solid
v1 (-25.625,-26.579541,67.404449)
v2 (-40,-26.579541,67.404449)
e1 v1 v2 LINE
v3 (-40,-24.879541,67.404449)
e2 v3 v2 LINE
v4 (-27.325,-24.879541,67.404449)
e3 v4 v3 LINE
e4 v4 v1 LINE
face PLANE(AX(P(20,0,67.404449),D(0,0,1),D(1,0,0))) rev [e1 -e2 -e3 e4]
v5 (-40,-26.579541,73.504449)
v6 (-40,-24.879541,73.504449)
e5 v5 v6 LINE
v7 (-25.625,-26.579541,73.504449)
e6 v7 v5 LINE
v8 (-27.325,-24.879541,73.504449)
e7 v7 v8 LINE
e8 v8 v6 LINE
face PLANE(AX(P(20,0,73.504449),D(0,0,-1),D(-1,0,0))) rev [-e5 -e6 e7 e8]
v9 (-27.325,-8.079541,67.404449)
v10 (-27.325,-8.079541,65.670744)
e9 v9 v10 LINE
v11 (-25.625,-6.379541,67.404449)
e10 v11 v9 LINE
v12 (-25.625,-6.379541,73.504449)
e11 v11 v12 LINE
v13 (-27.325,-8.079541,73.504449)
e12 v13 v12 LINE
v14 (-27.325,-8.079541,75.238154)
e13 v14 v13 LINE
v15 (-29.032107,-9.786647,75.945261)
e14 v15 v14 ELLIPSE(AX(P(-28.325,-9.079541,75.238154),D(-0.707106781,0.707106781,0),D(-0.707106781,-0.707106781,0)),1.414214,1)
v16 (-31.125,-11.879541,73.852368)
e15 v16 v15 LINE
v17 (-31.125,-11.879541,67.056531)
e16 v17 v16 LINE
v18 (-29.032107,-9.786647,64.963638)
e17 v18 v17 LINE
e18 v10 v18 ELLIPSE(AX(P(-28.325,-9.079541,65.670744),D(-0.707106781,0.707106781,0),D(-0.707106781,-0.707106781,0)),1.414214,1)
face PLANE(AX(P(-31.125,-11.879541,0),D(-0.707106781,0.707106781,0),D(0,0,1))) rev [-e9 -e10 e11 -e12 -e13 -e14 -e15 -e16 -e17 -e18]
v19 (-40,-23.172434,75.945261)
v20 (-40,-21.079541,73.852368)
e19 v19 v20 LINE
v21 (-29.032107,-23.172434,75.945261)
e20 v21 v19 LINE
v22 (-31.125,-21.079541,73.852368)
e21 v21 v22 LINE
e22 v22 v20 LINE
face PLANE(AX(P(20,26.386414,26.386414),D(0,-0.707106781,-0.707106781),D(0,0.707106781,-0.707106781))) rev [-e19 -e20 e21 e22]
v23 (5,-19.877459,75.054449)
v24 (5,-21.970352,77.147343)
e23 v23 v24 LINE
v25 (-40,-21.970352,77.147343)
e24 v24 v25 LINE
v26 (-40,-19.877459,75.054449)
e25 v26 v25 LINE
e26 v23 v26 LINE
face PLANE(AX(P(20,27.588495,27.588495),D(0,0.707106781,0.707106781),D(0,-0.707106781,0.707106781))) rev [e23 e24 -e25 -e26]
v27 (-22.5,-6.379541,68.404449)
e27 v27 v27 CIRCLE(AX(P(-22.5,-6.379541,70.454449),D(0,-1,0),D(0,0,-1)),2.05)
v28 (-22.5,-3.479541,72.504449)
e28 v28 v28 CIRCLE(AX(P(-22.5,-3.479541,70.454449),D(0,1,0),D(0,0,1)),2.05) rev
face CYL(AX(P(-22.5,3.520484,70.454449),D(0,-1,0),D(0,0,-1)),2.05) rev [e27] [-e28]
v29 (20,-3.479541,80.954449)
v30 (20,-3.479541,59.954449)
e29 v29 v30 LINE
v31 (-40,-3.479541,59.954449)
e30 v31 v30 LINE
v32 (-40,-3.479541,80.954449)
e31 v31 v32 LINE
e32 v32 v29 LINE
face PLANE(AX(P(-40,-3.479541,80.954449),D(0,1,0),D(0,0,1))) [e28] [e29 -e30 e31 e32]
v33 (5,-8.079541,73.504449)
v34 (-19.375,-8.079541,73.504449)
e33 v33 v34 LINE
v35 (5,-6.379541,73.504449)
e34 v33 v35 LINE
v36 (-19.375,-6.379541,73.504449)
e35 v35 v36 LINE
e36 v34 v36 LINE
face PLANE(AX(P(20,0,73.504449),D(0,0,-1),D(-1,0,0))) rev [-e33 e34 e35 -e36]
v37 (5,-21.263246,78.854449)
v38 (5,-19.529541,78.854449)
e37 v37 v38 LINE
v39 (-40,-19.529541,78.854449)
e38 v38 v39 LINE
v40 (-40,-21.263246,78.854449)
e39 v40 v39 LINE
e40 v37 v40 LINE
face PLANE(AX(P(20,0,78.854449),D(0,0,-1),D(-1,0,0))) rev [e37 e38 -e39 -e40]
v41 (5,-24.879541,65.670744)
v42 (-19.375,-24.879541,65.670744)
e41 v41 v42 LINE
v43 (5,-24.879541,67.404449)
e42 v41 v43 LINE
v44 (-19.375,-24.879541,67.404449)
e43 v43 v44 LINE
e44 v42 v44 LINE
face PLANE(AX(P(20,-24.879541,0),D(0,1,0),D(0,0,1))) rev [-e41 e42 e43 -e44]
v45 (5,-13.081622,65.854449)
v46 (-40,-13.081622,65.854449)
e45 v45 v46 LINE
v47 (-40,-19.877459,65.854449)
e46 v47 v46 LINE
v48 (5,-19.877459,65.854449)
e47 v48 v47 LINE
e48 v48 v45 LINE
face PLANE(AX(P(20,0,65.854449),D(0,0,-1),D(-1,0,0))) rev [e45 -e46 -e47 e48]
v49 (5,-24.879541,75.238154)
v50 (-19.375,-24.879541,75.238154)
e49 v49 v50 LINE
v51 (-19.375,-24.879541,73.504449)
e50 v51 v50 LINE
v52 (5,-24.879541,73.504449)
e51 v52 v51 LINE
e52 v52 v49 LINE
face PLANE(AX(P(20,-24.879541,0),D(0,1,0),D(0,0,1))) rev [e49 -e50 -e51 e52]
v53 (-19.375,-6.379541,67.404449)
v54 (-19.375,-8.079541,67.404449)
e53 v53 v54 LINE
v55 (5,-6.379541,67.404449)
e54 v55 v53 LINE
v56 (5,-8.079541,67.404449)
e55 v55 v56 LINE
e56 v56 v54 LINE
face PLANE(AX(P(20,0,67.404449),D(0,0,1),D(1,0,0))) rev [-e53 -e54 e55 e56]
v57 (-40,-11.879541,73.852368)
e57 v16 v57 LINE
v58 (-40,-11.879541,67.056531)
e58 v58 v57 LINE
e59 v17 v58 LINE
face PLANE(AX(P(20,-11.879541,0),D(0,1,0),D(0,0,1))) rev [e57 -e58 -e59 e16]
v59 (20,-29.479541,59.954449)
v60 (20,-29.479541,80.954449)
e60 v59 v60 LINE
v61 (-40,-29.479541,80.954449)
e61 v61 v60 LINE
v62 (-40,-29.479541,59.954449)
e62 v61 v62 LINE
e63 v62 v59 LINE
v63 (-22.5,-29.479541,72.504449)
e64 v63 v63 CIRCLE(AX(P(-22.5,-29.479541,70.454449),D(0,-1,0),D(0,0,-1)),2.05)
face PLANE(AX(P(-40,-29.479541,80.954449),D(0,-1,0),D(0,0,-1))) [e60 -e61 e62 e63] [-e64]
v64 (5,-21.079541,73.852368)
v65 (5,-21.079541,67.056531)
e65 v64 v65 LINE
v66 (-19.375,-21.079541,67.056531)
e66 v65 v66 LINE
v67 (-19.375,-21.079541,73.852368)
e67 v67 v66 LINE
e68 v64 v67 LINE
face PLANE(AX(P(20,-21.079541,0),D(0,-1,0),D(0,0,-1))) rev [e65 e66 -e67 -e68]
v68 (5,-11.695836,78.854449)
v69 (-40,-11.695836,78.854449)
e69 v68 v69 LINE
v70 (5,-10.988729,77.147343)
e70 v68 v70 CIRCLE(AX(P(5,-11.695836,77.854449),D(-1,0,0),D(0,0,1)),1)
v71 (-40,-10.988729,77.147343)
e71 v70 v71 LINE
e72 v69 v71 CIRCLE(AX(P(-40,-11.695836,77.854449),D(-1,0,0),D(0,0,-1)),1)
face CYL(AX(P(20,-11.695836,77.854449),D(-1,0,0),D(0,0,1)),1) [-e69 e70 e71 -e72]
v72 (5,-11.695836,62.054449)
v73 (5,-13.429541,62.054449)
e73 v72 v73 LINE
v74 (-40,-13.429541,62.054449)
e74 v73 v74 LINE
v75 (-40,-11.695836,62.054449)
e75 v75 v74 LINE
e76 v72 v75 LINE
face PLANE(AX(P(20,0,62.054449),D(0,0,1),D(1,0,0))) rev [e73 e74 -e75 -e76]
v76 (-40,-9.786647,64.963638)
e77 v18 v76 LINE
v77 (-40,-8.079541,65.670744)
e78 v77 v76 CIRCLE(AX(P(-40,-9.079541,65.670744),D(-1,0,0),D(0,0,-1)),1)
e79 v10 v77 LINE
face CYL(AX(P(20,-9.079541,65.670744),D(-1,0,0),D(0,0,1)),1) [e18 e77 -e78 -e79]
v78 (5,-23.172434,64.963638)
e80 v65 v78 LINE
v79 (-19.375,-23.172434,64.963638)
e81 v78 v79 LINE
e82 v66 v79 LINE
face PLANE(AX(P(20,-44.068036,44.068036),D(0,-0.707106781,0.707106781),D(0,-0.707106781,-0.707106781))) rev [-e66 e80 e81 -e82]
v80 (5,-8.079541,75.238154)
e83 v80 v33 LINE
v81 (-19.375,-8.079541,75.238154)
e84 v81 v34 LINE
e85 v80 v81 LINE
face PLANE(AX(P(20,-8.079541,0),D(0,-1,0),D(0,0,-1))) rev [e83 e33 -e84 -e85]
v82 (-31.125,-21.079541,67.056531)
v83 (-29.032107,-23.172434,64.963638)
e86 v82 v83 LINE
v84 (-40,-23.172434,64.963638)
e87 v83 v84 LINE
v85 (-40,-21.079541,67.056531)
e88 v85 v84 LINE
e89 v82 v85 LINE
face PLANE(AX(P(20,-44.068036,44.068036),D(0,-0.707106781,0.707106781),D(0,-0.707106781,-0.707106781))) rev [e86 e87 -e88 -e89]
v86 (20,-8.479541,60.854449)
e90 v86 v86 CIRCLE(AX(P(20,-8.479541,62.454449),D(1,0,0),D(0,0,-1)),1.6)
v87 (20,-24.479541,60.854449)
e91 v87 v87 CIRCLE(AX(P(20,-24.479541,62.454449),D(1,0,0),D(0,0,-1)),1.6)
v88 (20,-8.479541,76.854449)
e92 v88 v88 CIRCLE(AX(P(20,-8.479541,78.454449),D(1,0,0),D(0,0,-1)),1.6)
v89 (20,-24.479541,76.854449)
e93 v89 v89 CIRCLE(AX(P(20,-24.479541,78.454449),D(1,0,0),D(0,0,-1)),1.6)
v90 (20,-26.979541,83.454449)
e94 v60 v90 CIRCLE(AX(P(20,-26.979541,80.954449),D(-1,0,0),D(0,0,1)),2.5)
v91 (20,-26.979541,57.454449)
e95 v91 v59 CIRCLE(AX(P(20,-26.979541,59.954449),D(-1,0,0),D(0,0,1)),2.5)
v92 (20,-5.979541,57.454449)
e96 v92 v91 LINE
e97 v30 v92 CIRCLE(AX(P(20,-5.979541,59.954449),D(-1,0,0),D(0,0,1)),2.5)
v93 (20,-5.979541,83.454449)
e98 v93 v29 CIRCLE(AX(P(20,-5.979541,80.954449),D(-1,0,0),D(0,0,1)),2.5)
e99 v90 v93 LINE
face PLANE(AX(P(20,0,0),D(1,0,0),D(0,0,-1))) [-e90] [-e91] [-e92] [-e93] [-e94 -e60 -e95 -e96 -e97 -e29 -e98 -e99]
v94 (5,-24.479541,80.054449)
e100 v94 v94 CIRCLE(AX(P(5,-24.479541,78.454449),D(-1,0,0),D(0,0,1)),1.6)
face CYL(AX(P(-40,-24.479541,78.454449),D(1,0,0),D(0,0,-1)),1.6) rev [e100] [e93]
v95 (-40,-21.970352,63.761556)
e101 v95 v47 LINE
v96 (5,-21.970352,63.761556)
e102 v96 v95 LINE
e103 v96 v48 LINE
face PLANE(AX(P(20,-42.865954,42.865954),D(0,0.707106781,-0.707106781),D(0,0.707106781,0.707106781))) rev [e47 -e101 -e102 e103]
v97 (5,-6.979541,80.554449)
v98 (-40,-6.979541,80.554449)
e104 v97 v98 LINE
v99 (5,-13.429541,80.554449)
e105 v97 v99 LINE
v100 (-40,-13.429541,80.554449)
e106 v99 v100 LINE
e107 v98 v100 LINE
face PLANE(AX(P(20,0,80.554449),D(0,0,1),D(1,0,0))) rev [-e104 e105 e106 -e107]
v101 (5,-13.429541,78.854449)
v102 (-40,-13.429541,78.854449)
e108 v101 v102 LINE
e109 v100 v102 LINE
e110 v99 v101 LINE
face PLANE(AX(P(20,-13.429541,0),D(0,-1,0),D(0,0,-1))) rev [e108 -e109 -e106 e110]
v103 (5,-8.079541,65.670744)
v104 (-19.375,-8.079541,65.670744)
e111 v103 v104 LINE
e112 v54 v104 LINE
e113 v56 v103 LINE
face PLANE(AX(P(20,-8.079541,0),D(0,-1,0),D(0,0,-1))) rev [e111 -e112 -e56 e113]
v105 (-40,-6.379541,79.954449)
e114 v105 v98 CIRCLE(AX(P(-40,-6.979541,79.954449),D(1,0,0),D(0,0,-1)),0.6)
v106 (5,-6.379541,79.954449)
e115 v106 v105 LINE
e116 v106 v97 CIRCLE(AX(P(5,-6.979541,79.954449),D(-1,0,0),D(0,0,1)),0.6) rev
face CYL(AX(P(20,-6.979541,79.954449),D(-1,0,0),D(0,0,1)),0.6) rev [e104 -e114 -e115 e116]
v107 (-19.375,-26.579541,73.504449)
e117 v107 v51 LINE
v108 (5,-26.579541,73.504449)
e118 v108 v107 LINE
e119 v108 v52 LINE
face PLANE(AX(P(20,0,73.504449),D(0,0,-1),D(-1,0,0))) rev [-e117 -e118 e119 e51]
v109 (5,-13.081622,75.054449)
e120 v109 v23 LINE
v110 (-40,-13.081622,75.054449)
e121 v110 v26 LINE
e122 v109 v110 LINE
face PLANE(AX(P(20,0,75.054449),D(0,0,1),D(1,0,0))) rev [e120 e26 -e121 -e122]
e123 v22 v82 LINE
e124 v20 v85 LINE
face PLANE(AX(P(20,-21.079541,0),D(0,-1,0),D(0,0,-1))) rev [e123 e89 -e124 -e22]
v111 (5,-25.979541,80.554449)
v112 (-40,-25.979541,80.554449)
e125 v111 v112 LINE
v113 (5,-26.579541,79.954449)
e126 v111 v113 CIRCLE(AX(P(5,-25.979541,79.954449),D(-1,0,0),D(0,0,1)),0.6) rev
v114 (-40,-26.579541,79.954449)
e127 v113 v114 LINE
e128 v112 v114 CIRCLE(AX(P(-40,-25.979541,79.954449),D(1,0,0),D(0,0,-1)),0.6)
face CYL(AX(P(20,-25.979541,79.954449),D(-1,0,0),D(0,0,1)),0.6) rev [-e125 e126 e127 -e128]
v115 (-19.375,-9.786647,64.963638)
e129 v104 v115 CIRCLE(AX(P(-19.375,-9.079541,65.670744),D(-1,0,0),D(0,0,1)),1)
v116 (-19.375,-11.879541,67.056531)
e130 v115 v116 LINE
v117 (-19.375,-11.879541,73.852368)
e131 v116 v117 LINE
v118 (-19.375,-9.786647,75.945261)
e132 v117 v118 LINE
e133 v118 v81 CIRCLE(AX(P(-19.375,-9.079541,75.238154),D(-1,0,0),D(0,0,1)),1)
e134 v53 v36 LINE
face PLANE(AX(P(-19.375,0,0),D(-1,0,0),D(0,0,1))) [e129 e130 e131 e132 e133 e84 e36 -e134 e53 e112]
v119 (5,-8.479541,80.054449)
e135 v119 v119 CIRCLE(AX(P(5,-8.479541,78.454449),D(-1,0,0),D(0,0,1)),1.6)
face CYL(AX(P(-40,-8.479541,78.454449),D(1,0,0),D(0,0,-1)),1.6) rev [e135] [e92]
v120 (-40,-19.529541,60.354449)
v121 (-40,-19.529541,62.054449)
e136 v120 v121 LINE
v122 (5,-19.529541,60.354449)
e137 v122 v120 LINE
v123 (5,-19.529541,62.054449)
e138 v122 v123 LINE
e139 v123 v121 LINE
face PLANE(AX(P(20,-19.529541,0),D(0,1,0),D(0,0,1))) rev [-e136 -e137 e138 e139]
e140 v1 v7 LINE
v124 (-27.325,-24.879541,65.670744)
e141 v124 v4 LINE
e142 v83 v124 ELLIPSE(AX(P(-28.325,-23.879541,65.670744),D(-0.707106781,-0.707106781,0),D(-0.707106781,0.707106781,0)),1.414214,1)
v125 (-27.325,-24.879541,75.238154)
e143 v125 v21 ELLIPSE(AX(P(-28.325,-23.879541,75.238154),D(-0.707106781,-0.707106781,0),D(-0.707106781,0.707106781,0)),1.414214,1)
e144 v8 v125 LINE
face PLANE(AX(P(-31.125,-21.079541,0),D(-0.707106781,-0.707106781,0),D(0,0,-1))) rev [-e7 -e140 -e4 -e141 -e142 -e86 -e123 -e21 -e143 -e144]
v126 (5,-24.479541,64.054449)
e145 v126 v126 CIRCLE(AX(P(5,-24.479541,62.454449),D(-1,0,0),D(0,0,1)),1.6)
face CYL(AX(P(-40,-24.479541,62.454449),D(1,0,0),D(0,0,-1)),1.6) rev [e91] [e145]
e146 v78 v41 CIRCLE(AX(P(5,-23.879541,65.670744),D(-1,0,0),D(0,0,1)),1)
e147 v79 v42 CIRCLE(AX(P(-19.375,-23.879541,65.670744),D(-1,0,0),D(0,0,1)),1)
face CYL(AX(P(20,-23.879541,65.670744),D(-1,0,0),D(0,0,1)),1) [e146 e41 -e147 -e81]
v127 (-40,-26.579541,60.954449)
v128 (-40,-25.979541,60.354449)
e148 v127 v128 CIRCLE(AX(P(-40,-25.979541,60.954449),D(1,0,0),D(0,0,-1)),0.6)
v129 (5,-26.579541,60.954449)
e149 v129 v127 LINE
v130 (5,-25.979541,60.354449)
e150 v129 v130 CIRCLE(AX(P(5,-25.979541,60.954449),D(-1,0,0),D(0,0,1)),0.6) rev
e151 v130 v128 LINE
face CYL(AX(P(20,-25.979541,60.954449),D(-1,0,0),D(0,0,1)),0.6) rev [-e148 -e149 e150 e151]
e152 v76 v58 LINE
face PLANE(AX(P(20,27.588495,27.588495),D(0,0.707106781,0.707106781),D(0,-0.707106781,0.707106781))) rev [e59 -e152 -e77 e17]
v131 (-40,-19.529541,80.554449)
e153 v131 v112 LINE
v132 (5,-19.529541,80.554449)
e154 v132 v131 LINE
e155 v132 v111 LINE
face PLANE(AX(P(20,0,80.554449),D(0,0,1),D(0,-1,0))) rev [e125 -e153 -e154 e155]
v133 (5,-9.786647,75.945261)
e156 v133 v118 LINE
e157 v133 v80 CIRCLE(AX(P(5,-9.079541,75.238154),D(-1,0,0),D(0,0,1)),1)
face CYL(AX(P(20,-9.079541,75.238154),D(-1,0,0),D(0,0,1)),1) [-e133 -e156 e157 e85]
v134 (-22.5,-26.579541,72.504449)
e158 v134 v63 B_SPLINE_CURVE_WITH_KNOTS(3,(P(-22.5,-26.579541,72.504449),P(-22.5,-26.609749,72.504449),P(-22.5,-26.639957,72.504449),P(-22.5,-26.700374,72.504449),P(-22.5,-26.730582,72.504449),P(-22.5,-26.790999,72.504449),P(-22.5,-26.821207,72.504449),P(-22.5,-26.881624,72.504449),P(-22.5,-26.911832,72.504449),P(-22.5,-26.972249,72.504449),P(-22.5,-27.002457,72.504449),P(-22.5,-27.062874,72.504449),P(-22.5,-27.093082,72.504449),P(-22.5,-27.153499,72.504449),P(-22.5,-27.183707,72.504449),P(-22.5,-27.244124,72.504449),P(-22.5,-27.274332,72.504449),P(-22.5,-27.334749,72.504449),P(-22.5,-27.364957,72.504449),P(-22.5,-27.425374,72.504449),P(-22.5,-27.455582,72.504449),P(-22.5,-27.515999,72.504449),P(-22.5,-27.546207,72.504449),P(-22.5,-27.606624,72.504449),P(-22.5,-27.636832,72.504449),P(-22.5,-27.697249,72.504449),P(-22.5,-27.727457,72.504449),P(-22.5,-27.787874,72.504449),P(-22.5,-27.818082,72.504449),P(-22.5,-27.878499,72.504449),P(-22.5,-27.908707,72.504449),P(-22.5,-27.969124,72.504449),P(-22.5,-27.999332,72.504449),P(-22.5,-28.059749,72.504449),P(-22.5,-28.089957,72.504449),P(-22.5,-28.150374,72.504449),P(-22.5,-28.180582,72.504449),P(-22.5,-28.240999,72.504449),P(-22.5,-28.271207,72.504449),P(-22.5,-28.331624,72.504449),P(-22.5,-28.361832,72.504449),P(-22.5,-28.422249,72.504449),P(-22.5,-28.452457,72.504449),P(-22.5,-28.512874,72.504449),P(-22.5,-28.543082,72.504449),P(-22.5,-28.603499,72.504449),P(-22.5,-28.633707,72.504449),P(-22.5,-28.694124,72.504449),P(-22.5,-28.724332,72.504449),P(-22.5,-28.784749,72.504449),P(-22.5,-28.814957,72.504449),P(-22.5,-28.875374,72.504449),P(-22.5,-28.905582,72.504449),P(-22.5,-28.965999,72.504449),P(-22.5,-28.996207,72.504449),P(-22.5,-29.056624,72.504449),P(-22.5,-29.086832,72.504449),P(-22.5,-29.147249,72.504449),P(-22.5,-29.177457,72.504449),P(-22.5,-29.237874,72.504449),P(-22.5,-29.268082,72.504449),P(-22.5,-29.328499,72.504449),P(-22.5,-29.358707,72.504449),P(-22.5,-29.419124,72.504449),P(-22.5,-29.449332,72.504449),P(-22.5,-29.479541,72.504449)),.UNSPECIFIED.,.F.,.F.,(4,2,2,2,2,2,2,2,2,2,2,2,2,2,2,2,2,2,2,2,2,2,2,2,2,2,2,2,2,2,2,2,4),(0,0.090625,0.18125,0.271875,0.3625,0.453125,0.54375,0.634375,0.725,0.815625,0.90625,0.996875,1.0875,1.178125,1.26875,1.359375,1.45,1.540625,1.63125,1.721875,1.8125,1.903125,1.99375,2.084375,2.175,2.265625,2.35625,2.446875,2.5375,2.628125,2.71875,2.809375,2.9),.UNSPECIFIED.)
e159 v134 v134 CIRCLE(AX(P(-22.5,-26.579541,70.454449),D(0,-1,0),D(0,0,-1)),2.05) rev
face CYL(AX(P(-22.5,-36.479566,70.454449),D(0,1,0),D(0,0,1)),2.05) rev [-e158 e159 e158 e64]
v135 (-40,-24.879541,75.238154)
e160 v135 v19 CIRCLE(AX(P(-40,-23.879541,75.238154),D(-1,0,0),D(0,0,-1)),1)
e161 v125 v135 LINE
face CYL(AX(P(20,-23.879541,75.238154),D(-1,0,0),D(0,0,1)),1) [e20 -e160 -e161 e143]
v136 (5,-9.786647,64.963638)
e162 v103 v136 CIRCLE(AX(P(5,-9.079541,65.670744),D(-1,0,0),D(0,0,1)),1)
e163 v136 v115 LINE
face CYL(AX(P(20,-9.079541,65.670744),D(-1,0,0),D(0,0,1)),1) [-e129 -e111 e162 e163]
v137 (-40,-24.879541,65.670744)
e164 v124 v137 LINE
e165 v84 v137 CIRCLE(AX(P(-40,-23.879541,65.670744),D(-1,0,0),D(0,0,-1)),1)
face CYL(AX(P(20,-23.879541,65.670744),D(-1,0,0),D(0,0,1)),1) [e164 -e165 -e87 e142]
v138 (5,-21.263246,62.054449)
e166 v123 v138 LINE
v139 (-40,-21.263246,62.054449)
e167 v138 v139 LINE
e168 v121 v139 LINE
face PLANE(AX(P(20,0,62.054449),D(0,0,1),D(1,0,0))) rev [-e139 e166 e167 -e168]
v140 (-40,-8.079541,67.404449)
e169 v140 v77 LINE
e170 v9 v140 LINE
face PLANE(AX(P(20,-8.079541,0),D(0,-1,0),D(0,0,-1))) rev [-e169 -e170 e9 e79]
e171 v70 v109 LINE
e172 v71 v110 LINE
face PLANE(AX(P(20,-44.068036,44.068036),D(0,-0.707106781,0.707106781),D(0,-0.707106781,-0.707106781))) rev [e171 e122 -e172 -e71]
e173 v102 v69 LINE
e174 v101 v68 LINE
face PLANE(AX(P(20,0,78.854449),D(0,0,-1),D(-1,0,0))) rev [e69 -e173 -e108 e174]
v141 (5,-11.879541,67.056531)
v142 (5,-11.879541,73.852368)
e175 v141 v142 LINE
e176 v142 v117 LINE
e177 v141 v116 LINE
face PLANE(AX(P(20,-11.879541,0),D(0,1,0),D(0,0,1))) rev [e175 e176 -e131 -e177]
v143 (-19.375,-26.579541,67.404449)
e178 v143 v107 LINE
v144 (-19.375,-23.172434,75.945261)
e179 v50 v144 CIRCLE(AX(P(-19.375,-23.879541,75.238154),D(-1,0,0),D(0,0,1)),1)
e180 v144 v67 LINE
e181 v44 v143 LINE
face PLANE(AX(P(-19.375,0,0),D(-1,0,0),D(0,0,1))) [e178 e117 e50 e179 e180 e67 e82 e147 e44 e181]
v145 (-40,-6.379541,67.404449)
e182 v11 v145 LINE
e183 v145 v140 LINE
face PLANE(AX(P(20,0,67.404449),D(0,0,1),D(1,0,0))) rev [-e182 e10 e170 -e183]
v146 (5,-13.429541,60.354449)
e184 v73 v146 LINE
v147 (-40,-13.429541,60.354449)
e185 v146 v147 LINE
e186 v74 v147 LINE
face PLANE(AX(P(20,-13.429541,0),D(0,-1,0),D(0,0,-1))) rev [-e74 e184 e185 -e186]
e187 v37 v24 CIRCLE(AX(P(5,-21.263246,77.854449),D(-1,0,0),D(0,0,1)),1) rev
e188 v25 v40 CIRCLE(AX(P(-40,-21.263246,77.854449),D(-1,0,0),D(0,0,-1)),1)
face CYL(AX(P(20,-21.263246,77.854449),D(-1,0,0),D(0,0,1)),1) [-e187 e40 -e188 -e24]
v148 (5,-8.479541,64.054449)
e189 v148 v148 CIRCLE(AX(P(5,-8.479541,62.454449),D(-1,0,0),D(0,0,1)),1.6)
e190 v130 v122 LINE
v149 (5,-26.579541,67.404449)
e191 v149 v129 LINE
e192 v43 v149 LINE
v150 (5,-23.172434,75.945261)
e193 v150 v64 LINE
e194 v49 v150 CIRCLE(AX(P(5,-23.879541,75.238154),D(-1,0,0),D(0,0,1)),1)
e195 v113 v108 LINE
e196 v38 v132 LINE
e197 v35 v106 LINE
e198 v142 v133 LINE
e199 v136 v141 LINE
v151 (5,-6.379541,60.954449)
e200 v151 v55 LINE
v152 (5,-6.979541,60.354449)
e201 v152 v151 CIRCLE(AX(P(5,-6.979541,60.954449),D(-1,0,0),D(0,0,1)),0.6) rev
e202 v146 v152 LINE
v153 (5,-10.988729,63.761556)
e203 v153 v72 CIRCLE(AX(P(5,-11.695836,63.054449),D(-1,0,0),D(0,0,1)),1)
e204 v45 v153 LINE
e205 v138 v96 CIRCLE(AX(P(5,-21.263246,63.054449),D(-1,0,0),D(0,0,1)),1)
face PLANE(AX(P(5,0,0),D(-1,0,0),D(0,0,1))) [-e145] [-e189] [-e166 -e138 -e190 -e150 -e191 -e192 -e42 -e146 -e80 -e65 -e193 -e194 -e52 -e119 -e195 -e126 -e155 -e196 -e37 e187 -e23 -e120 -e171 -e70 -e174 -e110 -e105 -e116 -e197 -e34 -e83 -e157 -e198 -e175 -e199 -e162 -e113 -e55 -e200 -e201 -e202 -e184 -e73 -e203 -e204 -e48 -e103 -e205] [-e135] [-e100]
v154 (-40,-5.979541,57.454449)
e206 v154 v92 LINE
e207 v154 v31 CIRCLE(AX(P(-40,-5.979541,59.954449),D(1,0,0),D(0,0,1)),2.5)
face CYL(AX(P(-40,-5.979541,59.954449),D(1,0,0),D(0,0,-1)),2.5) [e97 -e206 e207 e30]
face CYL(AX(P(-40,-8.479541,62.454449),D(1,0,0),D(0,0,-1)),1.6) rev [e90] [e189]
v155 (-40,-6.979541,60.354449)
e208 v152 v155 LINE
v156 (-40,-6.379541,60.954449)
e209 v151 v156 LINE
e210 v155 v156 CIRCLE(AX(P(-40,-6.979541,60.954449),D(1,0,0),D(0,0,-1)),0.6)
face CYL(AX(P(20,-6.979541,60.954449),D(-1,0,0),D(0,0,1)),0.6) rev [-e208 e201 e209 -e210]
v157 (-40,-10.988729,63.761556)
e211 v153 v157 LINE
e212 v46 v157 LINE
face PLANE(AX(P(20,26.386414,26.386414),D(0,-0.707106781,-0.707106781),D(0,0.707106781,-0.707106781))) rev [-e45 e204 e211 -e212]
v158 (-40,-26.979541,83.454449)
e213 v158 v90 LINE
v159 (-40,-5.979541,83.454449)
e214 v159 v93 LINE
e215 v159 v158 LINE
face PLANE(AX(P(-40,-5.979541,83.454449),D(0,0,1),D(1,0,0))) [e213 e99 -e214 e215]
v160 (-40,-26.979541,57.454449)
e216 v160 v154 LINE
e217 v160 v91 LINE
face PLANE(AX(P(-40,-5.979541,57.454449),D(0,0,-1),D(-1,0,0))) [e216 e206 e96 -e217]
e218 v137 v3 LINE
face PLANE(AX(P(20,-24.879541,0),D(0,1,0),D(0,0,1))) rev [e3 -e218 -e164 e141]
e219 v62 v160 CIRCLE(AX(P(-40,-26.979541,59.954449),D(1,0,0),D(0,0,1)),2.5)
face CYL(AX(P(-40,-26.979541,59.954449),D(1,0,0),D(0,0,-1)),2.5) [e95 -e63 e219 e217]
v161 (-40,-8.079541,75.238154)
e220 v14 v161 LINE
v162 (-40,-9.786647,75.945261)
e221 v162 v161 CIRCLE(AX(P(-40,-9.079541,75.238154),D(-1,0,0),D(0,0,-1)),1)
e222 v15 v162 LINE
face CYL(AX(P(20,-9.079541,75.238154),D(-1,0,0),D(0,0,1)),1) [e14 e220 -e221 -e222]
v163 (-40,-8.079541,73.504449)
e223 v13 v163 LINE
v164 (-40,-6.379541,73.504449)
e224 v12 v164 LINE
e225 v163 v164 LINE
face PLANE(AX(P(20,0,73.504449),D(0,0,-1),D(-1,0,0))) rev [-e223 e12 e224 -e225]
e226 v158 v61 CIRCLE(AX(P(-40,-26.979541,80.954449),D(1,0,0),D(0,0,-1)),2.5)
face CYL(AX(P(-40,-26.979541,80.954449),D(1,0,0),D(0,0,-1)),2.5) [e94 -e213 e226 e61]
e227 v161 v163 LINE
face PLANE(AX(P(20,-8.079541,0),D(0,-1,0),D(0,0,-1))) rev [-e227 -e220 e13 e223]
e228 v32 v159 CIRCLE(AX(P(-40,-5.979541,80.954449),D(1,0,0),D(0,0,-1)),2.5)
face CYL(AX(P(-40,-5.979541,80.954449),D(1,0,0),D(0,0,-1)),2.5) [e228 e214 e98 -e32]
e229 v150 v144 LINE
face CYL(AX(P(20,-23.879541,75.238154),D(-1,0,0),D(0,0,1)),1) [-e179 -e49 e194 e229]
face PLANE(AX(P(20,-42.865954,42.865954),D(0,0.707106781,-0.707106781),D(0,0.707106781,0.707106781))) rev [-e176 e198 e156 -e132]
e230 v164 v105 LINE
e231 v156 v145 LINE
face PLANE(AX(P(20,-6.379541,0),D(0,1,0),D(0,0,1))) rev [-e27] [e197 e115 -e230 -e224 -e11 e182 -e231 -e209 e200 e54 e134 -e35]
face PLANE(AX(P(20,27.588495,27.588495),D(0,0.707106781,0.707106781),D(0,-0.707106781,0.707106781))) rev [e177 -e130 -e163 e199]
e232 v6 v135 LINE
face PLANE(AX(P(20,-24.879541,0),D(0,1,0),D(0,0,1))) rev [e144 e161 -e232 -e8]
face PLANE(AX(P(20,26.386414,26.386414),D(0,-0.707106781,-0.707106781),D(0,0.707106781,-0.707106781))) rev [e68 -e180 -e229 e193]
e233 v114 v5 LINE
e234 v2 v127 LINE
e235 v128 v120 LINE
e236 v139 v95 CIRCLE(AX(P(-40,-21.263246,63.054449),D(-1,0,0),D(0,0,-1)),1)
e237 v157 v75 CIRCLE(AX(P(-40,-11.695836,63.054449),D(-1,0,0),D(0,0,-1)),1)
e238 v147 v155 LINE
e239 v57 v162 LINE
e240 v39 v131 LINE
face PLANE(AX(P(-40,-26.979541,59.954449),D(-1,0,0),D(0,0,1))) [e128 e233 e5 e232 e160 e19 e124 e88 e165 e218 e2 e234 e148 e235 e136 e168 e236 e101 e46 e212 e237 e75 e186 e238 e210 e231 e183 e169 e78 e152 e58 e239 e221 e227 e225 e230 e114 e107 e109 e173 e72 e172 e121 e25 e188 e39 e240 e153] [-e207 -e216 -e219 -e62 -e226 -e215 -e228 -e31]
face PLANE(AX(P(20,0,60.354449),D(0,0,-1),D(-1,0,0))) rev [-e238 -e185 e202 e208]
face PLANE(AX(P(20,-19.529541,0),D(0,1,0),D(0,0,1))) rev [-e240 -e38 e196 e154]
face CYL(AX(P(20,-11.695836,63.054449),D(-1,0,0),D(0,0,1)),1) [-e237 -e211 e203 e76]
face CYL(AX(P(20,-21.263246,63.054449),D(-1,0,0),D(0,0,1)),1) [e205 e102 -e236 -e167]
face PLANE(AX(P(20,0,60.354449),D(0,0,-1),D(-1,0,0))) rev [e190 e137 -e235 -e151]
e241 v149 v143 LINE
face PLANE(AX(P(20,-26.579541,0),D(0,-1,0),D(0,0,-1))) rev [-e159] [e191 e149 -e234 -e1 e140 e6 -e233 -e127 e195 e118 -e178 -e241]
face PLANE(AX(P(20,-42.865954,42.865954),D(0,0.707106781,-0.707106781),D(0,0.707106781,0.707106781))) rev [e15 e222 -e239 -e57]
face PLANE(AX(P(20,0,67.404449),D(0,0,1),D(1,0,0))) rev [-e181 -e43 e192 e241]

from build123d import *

# Parameters (mm, degrees)
BOSS_EXTRUDE1_DEPTH      = 39
BOSS_EXTRUDE1_DEPTH_BACK = 20
SKETCH1_W                = 42
SKETCH1_H                = 40
CUT_EXTRUDE3_DEPTH       = 68.939361812
CUT_EXTRUDE3_DEPTH_BACK  = 68.939361812
BOSS_EXTRUDE2_DEPTH      = 40
CUT_EXTRUDE7_START       = -10
SKETCH7_R                = 2.05
CUT_EXTRUDE7_DEPTH       = 116.132850877
CUT_EXTRUDE8_DEPTH       = 3.125
SKETCH9_R                = 2.778089848
BOSS_EXTRUDE3_DEPTH      = 6
CIRPATTERN1_COUNT        = 2
SKETCH10_W               = 6.985924482
SKETCH10_H               = 7.120269183
CUT_EXTRUDE13_DEPTH      = 8
SKETCH14_OUTSIDE_W       = 60.69
SKETCH14_OUTSIDE_H       = 58.69
CUT_EXTRUDE14_DEPTH      = 116.302529068
CHAMFER1_SIZE            = 5.5
SKETCH17_W               = 21.827069389
SKETCH17_H               = 22.909403407
BOSS_EXTRUDE4_DEPTH      = 15
SKETCH18_R               = 1.6
CUT_EXTRUDE15_DEPTH      = 107.928426814


with BuildPart() as part:
    # Sketch1 → Boss-Extrude1 (new, two sides: drawn at the far end of the back side and taken through both)
    with BuildSketch(Plane.ZY.offset(-BOSS_EXTRUDE1_DEPTH_BACK)):
        with Locations((70.454449321, -16.479540615)):
            Rectangle(SKETCH1_W, SKETCH1_H)
        with BuildLine():
            Line((77.147342539, -21.970352305), (75.054449321, -19.877459087))
            Line((75.054449321, -19.877459087), (75.054449321, -13.081622143))
            Line((75.054449321, -13.081622143), (77.147342539, -10.988728924))
            ThreePointArc((77.147342539, -10.988728924), (78.237132753, -10.771956173), (78.854449321, -11.695835705))
            Line((78.854449321, -11.695835705), (78.854449321, -13.429540615))
            Line((78.854449321, -13.429540615), (80.554449321, -13.429540615))
            Line((80.554449321, -13.429540615), (80.554449321, -6.979540615))
            ThreePointArc((80.554449321, -6.979540615), (80.378713389, -6.555276546), (79.954449321, -6.379540615))
            Line((79.954449321, -6.379540615), (73.504449321, -6.379540615))
            Line((73.504449321, -6.379540615), (73.504449321, -8.079540615))
            Line((73.504449321, -8.079540615), (75.23815423, -8.079540615))
            ThreePointArc((75.23815423, -8.079540615), (76.162033763, -8.696857182), (75.945261011, -9.786647396))
            Line((75.945261011, -9.786647396), (73.852367793, -11.879540615))
            Line((73.852367793, -11.879540615), (67.056530849, -11.879540615))
            Line((67.056530849, -11.879540615), (64.96363763, -9.786647396))
            ThreePointArc((64.96363763, -9.786647396), (64.746864878, -8.696857182), (65.670744411, -8.079540615))
            Line((65.670744411, -8.079540615), (67.404449321, -8.079540615))
            Line((67.404449321, -8.079540615), (67.404449321, -6.379540615))
            Line((67.404449321, -6.379540615), (60.954449321, -6.379540615))
            ThreePointArc((60.954449321, -6.379540615), (60.530185252, -6.555276546), (60.354449321, -6.979540615))
            Line((60.354449321, -6.979540615), (60.354449321, -13.429540615))
            Line((60.354449321, -13.429540615), (62.054449321, -13.429540615))
            Line((62.054449321, -13.429540615), (62.054449321, -11.695835705))
            ThreePointArc((62.054449321, -11.695835705), (62.671765888, -10.771956173), (63.761556102, -10.988728924))
            Line((63.761556102, -10.988728924), (65.854449321, -13.081622143))
            Line((65.854449321, -13.081622143), (65.854449321, -19.877459087))
            Line((65.854449321, -19.877459087), (63.761556102, -21.970352305))
            ThreePointArc((63.761556102, -21.970352305), (62.671765888, -22.187125057), (62.054449321, -21.263245524))
            Line((62.054449321, -21.263245524), (62.054449321, -19.529540615))
            Line((62.054449321, -19.529540615), (60.354449321, -19.529540615))
            Line((60.354449321, -19.529540615), (60.354449321, -25.979540615))
            ThreePointArc((60.354449321, -25.979540615), (60.530185252, -26.403804683), (60.954449321, -26.579540615))
            Line((60.954449321, -26.579540615), (67.404449321, -26.579540615))
            Line((67.404449321, -26.579540615), (67.404449321, -24.879540615))
            Line((67.404449321, -24.879540615), (65.670744411, -24.879540615))
            ThreePointArc((65.670744411, -24.879540615), (64.746864878, -24.262224047), (64.96363763, -23.172433833))
            Line((64.96363763, -23.172433833), (67.056530849, -21.079540615))
            Line((67.056530849, -21.079540615), (73.852367793, -21.079540615))
            Line((73.852367793, -21.079540615), (75.945261011, -23.172433833))
            ThreePointArc((75.945261011, -23.172433833), (76.162033763, -24.262224047), (75.23815423, -24.879540615))
            Line((75.23815423, -24.879540615), (73.504449321, -24.879540615))
            Line((73.504449321, -24.879540615), (73.504449321, -26.579540615))
            Line((73.504449321, -26.579540615), (79.954449321, -26.579540615))
            ThreePointArc((79.954449321, -26.579540615), (80.378713389, -26.403804683), (80.554449321, -25.979540615))
            Line((80.554449321, -25.979540615), (80.554449321, -19.529540615))
            Line((80.554449321, -19.529540615), (78.854449321, -19.529540615))
            Line((78.854449321, -19.529540615), (78.854449321, -21.263245524))
            ThreePointArc((78.854449321, -21.263245524), (78.237132753, -22.187125057), (77.147342539, -21.970352305))
        make_face(mode=Mode.SUBTRACT)
    extrude(amount=BOSS_EXTRUDE1_DEPTH + BOSS_EXTRUDE1_DEPTH_BACK)

    # Sketch2 → Cut-Extrude3 (cut, two sides: drawn at the far end of the back side and taken through both)
    with BuildSketch(Plane(origin=(0, 0, 91.454449321), x_dir=(-1, 0, 0), z_dir=(0, 0, -1)).offset(-CUT_EXTRUDE3_DEPTH_BACK)):
        with BuildLine():
            Line((9, 3.520459385), (39, 3.520459385))
            Line((39, 3.520459385), (39, -36.479540615))
            Line((39, -36.479540615), (30.968670474, -36.479540615))
            ThreePointArc((30.968670474, -36.479540615), (30.884335237, -36.480014542), (30.8, -36.479540615))
            Line((30.8, -36.479540615), (30.8, -37.552822487))
            Line((30.8, -37.552822487), (41.446354872, -37.552822487))
            Line((41.446354872, -37.552822487), (41.446354872, 6.899861608))
            Line((41.446354872, 6.899861608), (9, 6.899861608))
            Line((9, 6.899861608), (9, 3.520459385))
        make_face()
        with BuildLine():
            Line((39, -36.479540615), (39, 3.520459385))
            Line((39, 3.520459385), (9, 3.520459385))
            Line((9, 3.520459385), (36.19042941, -23.669970025))
            ThreePointArc((36.19042941, -23.669970025), (37.833109012, -31.808697916), (30.968670474, -36.479540615))
            Line((30.968670474, -36.479540615), (39, -36.479540615))
        make_face()
    extrude(amount=CUT_EXTRUDE3_DEPTH + CUT_EXTRUDE3_DEPTH_BACK, mode=Mode.SUBTRACT)

    # Sketch4 → Boss-Extrude2 (add)
    with BuildSketch(Plane(origin=(0, 0, 0), x_dir=(0, 0, -1), z_dir=(1, 0, 0))):
        with BuildLine():
            Line((-80.954449321, -3.479540615), (-59.954449321, -3.479540615))
            ThreePointArc((-59.954449321, -3.479540615), (-58.186682368, -4.211773662), (-57.454449321, -5.979540615))
            Line((-57.454449321, -5.979540615), (-57.454449321, -26.979540615))
            ThreePointArc((-57.454449321, -26.979540615), (-58.186682368, -28.747307568), (-59.954449321, -29.479540615))
            Line((-59.954449321, -29.479540615), (-80.954449321, -29.479540615))
            ThreePointArc((-80.954449321, -29.479540615), (-82.722216274, -28.747307568), (-83.454449321, -26.979540615))
            Line((-83.454449321, -26.979540615), (-83.454449321, -5.979540615))
            ThreePointArc((-83.454449321, -5.979540615), (-82.722216274, -4.211773662), (-80.954449321, -3.479540615))
        make_face()
        with BuildLine():
            Line((-62.054449321, -11.695835705), (-62.054449321, -13.429540615))
            Line((-62.054449321, -13.429540615), (-60.354449321, -13.429540615))
            Line((-60.354449321, -13.429540615), (-60.354449321, -6.979540615))
            ThreePointArc((-60.354449321, -6.979540615), (-60.530185252, -6.555276546), (-60.954449321, -6.379540615))
            Line((-60.954449321, -6.379540615), (-67.404449321, -6.379540615))
            Line((-67.404449321, -6.379540615), (-67.404449321, -8.079540615))
            Line((-67.404449321, -8.079540615), (-65.670744411, -8.079540615))
            ThreePointArc((-65.670744411, -8.079540615), (-64.746864878, -8.696857182), (-64.96363763, -9.786647396))
            Line((-64.96363763, -9.786647396), (-67.056530849, -11.879540615))
            Line((-67.056530849, -11.879540615), (-73.852367793, -11.879540615))
            Line((-73.852367793, -11.879540615), (-75.945261011, -9.786647396))
            ThreePointArc((-75.945261011, -9.786647396), (-76.162033763, -8.696857182), (-75.23815423, -8.079540615))
            Line((-75.23815423, -8.079540615), (-73.504449321, -8.079540615))
            Line((-73.504449321, -8.079540615), (-73.504449321, -6.379540615))
            Line((-73.504449321, -6.379540615), (-79.954449321, -6.379540615))
            ThreePointArc((-79.954449321, -6.379540615), (-80.378713389, -6.555276546), (-80.554449321, -6.979540615))
            Line((-80.554449321, -6.979540615), (-80.554449321, -13.429540615))
            Line((-80.554449321, -13.429540615), (-78.854449321, -13.429540615))
            Line((-78.854449321, -13.429540615), (-78.854449321, -11.695835705))
            ThreePointArc((-78.854449321, -11.695835705), (-78.237132753, -10.771956173), (-77.147342539, -10.988728924))
            Line((-77.147342539, -10.988728924), (-75.054449321, -13.081622143))
            Line((-75.054449321, -13.081622143), (-75.054449321, -19.877459087))
            Line((-75.054449321, -19.877459087), (-77.147342539, -21.970352305))
            ThreePointArc((-77.147342539, -21.970352305), (-78.237132753, -22.187125057), (-78.854449321, -21.263245524))
            Line((-78.854449321, -21.263245524), (-78.854449321, -19.529540615))
            Line((-78.854449321, -19.529540615), (-80.554449321, -19.529540615))
            Line((-80.554449321, -19.529540615), (-80.554449321, -25.979540615))
            ThreePointArc((-80.554449321, -25.979540615), (-80.378713389, -26.403804683), (-79.954449321, -26.579540615))
            Line((-79.954449321, -26.579540615), (-73.504449321, -26.579540615))
            Line((-73.504449321, -26.579540615), (-73.504449321, -24.879540615))
            Line((-73.504449321, -24.879540615), (-75.23815423, -24.879540615))
            ThreePointArc((-75.23815423, -24.879540615), (-76.162033763, -24.262224047), (-75.945261011, -23.172433833))
            Line((-75.945261011, -23.172433833), (-73.852367793, -21.079540615))
            Line((-73.852367793, -21.079540615), (-67.056530849, -21.079540615))
            Line((-67.056530849, -21.079540615), (-64.96363763, -23.172433833))
            ThreePointArc((-64.96363763, -23.172433833), (-64.746864878, -24.262224047), (-65.670744411, -24.879540615))
            Line((-65.670744411, -24.879540615), (-67.404449321, -24.879540615))
            Line((-67.404449321, -24.879540615), (-67.404449321, -26.579540615))
            Line((-67.404449321, -26.579540615), (-60.954449321, -26.579540615))
            ThreePointArc((-60.954449321, -26.579540615), (-60.530185252, -26.403804683), (-60.354449321, -25.979540615))
            Line((-60.354449321, -25.979540615), (-60.354449321, -19.529540615))
            Line((-60.354449321, -19.529540615), (-62.054449321, -19.529540615))
            Line((-62.054449321, -19.529540615), (-62.054449321, -21.263245524))
            ThreePointArc((-62.054449321, -21.263245524), (-62.671765888, -22.187125057), (-63.761556102, -21.970352305))
            Line((-63.761556102, -21.970352305), (-65.854449321, -19.877459087))
            Line((-65.854449321, -19.877459087), (-65.854449321, -13.081622143))
            Line((-65.854449321, -13.081622143), (-63.761556102, -10.988728924))
            ThreePointArc((-63.761556102, -10.988728924), (-62.671765888, -10.771956173), (-62.054449321, -11.695835705))
        make_face(mode=Mode.SUBTRACT)
    extrude(amount=-BOSS_EXTRUDE2_DEPTH)

    # Sketch7 → Cut-Extrude7 (cut)
    with BuildSketch(Plane(origin=(0, -3.479540615, 0), x_dir=(1, 0, 0), z_dir=(0, 1, 0)).offset(CUT_EXTRUDE7_START)):
        with Locations(Location((-22.5, -70.454449321, 0), (0, 0, 270))):
            Circle(SKETCH7_R)
    cut_extrude7 = extrude(amount=CUT_EXTRUDE7_DEPTH, mode=Mode.SUBTRACT)

    # Sketch8 → Cut-Extrude8 (cut, symmetric)
    with BuildSketch(Plane.ZY.offset(22.5)):
        Polygon((60.954449321, -6.379540615), (79.954449321, -6.379540615), (70.690797066, -16.49195704), align=None)
        Polygon((70.690797066, -16.49195704), (60.954449321, -26.579540615), (79.954449321, -26.579540615), align=None)
    extrude(amount=CUT_EXTRUDE8_DEPTH, both=True, mode=Mode.SUBTRACT)

    # CirPattern1: Cut-Extrude7 ×2 about axis
    cirpattern1_axis = Axis((-34, -16.479540615, 70.454449321), (-1, 0, 0))
    for i in range(1, CIRPATTERN1_COUNT):
        add(cut_extrude7.rotate(cirpattern1_axis, i * 360 / CIRPATTERN1_COUNT), mode=Mode.SUBTRACT)

    # Sketch14 outside → Cut-Extrude14 (cut, through all)
    with BuildSketch(Plane.ZY.offset(40)):
        with Locations((70.454, -16.48)):
            Rectangle(SKETCH14_OUTSIDE_W, SKETCH14_OUTSIDE_H)
        with BuildLine():
            Line((59.954449321, -29.479540615), (80.954449321, -29.479540615))
            ThreePointArc((80.954449321, -29.479540615), (82.722216274, -28.747307568), (83.454449321, -26.979540615))
            Line((83.454449321, -26.979540615), (83.454449321, -5.979540615))
            ThreePointArc((83.454449321, -5.979540615), (82.722216274, -4.211773662), (80.954449321, -3.479540615))
            Line((80.954449321, -3.479540615), (59.954449321, -3.479540615))
            ThreePointArc((59.954449321, -3.479540615), (58.186682368, -4.211773662), (57.454449321, -5.979540615))
            Line((57.454449321, -5.979540615), (57.454449321, -26.979540615))
            ThreePointArc((57.454449321, -26.979540615), (58.186682368, -28.747307568), (59.954449321, -29.479540615))
        make_face(mode=Mode.SUBTRACT)
    extrude(amount=-CUT_EXTRUDE14_DEPTH, mode=Mode.SUBTRACT)

    # Chamfer1
    chamfer1_edges = [part.edges().sort_by_distance(p)[0] for p in [
        (-25.625, -11.879540615, 70.454449321),
        (-25.625, -21.079540615, 70.454449321),
    ]]
    chamfer(chamfer1_edges, length=CHAMFER1_SIZE - 0.0001)  # a hair under: the kernel refuses the full size

    # Sketch17 → Boss-Extrude4 (add)
    with BuildSketch(Plane(origin=(20, 0, 0), x_dir=(0, 0, -1), z_dir=(1, 0, 0))):
        with Locations((-70.499546572, -16.637380993)):
            Rectangle(SKETCH17_W, SKETCH17_H)
    extrude(amount=-BOSS_EXTRUDE4_DEPTH)

    # Sketch18 → Cut-Extrude15 (cut, through all)
    with BuildSketch(Plane(origin=(20, 0, 0), x_dir=(0, 0, -1), z_dir=(1, 0, 0))):
        with Locations((-78.454449321, -8.479540615)):
            Circle(SKETCH18_R)
        with Locations((-62.454449321, -8.479540615)):
            Circle(SKETCH18_R)
        with Locations((-62.454449321, -24.479540615)):
            Circle(SKETCH18_R)
        with Locations((-78.454449321, -24.479540615)):
            Circle(SKETCH18_R)
    extrude(amount=-CUT_EXTRUDE15_DEPTH, mode=Mode.SUBTRACT)


with BuildPart() as body_2:
    # Sketch9 → Boss-Extrude3 (new body)
    with BuildSketch(Plane.ZY.offset(40)):
        with Locations((70.454449321, -16.479540615)):
            Circle(SKETCH9_R)
    extrude(amount=-BOSS_EXTRUDE3_DEPTH)

    # Sketch10 → Cut-Extrude13 (cut, symmetric)
    with BuildSketch(Plane.ZY.offset(40)):
        with Locations((70.605937199, -16.255142793)):
            Rectangle(SKETCH10_W, SKETCH10_H)
    extrude(amount=CUT_EXTRUDE13_DEPTH, both=True, mode=Mode.SUBTRACT)


solid = part.part
